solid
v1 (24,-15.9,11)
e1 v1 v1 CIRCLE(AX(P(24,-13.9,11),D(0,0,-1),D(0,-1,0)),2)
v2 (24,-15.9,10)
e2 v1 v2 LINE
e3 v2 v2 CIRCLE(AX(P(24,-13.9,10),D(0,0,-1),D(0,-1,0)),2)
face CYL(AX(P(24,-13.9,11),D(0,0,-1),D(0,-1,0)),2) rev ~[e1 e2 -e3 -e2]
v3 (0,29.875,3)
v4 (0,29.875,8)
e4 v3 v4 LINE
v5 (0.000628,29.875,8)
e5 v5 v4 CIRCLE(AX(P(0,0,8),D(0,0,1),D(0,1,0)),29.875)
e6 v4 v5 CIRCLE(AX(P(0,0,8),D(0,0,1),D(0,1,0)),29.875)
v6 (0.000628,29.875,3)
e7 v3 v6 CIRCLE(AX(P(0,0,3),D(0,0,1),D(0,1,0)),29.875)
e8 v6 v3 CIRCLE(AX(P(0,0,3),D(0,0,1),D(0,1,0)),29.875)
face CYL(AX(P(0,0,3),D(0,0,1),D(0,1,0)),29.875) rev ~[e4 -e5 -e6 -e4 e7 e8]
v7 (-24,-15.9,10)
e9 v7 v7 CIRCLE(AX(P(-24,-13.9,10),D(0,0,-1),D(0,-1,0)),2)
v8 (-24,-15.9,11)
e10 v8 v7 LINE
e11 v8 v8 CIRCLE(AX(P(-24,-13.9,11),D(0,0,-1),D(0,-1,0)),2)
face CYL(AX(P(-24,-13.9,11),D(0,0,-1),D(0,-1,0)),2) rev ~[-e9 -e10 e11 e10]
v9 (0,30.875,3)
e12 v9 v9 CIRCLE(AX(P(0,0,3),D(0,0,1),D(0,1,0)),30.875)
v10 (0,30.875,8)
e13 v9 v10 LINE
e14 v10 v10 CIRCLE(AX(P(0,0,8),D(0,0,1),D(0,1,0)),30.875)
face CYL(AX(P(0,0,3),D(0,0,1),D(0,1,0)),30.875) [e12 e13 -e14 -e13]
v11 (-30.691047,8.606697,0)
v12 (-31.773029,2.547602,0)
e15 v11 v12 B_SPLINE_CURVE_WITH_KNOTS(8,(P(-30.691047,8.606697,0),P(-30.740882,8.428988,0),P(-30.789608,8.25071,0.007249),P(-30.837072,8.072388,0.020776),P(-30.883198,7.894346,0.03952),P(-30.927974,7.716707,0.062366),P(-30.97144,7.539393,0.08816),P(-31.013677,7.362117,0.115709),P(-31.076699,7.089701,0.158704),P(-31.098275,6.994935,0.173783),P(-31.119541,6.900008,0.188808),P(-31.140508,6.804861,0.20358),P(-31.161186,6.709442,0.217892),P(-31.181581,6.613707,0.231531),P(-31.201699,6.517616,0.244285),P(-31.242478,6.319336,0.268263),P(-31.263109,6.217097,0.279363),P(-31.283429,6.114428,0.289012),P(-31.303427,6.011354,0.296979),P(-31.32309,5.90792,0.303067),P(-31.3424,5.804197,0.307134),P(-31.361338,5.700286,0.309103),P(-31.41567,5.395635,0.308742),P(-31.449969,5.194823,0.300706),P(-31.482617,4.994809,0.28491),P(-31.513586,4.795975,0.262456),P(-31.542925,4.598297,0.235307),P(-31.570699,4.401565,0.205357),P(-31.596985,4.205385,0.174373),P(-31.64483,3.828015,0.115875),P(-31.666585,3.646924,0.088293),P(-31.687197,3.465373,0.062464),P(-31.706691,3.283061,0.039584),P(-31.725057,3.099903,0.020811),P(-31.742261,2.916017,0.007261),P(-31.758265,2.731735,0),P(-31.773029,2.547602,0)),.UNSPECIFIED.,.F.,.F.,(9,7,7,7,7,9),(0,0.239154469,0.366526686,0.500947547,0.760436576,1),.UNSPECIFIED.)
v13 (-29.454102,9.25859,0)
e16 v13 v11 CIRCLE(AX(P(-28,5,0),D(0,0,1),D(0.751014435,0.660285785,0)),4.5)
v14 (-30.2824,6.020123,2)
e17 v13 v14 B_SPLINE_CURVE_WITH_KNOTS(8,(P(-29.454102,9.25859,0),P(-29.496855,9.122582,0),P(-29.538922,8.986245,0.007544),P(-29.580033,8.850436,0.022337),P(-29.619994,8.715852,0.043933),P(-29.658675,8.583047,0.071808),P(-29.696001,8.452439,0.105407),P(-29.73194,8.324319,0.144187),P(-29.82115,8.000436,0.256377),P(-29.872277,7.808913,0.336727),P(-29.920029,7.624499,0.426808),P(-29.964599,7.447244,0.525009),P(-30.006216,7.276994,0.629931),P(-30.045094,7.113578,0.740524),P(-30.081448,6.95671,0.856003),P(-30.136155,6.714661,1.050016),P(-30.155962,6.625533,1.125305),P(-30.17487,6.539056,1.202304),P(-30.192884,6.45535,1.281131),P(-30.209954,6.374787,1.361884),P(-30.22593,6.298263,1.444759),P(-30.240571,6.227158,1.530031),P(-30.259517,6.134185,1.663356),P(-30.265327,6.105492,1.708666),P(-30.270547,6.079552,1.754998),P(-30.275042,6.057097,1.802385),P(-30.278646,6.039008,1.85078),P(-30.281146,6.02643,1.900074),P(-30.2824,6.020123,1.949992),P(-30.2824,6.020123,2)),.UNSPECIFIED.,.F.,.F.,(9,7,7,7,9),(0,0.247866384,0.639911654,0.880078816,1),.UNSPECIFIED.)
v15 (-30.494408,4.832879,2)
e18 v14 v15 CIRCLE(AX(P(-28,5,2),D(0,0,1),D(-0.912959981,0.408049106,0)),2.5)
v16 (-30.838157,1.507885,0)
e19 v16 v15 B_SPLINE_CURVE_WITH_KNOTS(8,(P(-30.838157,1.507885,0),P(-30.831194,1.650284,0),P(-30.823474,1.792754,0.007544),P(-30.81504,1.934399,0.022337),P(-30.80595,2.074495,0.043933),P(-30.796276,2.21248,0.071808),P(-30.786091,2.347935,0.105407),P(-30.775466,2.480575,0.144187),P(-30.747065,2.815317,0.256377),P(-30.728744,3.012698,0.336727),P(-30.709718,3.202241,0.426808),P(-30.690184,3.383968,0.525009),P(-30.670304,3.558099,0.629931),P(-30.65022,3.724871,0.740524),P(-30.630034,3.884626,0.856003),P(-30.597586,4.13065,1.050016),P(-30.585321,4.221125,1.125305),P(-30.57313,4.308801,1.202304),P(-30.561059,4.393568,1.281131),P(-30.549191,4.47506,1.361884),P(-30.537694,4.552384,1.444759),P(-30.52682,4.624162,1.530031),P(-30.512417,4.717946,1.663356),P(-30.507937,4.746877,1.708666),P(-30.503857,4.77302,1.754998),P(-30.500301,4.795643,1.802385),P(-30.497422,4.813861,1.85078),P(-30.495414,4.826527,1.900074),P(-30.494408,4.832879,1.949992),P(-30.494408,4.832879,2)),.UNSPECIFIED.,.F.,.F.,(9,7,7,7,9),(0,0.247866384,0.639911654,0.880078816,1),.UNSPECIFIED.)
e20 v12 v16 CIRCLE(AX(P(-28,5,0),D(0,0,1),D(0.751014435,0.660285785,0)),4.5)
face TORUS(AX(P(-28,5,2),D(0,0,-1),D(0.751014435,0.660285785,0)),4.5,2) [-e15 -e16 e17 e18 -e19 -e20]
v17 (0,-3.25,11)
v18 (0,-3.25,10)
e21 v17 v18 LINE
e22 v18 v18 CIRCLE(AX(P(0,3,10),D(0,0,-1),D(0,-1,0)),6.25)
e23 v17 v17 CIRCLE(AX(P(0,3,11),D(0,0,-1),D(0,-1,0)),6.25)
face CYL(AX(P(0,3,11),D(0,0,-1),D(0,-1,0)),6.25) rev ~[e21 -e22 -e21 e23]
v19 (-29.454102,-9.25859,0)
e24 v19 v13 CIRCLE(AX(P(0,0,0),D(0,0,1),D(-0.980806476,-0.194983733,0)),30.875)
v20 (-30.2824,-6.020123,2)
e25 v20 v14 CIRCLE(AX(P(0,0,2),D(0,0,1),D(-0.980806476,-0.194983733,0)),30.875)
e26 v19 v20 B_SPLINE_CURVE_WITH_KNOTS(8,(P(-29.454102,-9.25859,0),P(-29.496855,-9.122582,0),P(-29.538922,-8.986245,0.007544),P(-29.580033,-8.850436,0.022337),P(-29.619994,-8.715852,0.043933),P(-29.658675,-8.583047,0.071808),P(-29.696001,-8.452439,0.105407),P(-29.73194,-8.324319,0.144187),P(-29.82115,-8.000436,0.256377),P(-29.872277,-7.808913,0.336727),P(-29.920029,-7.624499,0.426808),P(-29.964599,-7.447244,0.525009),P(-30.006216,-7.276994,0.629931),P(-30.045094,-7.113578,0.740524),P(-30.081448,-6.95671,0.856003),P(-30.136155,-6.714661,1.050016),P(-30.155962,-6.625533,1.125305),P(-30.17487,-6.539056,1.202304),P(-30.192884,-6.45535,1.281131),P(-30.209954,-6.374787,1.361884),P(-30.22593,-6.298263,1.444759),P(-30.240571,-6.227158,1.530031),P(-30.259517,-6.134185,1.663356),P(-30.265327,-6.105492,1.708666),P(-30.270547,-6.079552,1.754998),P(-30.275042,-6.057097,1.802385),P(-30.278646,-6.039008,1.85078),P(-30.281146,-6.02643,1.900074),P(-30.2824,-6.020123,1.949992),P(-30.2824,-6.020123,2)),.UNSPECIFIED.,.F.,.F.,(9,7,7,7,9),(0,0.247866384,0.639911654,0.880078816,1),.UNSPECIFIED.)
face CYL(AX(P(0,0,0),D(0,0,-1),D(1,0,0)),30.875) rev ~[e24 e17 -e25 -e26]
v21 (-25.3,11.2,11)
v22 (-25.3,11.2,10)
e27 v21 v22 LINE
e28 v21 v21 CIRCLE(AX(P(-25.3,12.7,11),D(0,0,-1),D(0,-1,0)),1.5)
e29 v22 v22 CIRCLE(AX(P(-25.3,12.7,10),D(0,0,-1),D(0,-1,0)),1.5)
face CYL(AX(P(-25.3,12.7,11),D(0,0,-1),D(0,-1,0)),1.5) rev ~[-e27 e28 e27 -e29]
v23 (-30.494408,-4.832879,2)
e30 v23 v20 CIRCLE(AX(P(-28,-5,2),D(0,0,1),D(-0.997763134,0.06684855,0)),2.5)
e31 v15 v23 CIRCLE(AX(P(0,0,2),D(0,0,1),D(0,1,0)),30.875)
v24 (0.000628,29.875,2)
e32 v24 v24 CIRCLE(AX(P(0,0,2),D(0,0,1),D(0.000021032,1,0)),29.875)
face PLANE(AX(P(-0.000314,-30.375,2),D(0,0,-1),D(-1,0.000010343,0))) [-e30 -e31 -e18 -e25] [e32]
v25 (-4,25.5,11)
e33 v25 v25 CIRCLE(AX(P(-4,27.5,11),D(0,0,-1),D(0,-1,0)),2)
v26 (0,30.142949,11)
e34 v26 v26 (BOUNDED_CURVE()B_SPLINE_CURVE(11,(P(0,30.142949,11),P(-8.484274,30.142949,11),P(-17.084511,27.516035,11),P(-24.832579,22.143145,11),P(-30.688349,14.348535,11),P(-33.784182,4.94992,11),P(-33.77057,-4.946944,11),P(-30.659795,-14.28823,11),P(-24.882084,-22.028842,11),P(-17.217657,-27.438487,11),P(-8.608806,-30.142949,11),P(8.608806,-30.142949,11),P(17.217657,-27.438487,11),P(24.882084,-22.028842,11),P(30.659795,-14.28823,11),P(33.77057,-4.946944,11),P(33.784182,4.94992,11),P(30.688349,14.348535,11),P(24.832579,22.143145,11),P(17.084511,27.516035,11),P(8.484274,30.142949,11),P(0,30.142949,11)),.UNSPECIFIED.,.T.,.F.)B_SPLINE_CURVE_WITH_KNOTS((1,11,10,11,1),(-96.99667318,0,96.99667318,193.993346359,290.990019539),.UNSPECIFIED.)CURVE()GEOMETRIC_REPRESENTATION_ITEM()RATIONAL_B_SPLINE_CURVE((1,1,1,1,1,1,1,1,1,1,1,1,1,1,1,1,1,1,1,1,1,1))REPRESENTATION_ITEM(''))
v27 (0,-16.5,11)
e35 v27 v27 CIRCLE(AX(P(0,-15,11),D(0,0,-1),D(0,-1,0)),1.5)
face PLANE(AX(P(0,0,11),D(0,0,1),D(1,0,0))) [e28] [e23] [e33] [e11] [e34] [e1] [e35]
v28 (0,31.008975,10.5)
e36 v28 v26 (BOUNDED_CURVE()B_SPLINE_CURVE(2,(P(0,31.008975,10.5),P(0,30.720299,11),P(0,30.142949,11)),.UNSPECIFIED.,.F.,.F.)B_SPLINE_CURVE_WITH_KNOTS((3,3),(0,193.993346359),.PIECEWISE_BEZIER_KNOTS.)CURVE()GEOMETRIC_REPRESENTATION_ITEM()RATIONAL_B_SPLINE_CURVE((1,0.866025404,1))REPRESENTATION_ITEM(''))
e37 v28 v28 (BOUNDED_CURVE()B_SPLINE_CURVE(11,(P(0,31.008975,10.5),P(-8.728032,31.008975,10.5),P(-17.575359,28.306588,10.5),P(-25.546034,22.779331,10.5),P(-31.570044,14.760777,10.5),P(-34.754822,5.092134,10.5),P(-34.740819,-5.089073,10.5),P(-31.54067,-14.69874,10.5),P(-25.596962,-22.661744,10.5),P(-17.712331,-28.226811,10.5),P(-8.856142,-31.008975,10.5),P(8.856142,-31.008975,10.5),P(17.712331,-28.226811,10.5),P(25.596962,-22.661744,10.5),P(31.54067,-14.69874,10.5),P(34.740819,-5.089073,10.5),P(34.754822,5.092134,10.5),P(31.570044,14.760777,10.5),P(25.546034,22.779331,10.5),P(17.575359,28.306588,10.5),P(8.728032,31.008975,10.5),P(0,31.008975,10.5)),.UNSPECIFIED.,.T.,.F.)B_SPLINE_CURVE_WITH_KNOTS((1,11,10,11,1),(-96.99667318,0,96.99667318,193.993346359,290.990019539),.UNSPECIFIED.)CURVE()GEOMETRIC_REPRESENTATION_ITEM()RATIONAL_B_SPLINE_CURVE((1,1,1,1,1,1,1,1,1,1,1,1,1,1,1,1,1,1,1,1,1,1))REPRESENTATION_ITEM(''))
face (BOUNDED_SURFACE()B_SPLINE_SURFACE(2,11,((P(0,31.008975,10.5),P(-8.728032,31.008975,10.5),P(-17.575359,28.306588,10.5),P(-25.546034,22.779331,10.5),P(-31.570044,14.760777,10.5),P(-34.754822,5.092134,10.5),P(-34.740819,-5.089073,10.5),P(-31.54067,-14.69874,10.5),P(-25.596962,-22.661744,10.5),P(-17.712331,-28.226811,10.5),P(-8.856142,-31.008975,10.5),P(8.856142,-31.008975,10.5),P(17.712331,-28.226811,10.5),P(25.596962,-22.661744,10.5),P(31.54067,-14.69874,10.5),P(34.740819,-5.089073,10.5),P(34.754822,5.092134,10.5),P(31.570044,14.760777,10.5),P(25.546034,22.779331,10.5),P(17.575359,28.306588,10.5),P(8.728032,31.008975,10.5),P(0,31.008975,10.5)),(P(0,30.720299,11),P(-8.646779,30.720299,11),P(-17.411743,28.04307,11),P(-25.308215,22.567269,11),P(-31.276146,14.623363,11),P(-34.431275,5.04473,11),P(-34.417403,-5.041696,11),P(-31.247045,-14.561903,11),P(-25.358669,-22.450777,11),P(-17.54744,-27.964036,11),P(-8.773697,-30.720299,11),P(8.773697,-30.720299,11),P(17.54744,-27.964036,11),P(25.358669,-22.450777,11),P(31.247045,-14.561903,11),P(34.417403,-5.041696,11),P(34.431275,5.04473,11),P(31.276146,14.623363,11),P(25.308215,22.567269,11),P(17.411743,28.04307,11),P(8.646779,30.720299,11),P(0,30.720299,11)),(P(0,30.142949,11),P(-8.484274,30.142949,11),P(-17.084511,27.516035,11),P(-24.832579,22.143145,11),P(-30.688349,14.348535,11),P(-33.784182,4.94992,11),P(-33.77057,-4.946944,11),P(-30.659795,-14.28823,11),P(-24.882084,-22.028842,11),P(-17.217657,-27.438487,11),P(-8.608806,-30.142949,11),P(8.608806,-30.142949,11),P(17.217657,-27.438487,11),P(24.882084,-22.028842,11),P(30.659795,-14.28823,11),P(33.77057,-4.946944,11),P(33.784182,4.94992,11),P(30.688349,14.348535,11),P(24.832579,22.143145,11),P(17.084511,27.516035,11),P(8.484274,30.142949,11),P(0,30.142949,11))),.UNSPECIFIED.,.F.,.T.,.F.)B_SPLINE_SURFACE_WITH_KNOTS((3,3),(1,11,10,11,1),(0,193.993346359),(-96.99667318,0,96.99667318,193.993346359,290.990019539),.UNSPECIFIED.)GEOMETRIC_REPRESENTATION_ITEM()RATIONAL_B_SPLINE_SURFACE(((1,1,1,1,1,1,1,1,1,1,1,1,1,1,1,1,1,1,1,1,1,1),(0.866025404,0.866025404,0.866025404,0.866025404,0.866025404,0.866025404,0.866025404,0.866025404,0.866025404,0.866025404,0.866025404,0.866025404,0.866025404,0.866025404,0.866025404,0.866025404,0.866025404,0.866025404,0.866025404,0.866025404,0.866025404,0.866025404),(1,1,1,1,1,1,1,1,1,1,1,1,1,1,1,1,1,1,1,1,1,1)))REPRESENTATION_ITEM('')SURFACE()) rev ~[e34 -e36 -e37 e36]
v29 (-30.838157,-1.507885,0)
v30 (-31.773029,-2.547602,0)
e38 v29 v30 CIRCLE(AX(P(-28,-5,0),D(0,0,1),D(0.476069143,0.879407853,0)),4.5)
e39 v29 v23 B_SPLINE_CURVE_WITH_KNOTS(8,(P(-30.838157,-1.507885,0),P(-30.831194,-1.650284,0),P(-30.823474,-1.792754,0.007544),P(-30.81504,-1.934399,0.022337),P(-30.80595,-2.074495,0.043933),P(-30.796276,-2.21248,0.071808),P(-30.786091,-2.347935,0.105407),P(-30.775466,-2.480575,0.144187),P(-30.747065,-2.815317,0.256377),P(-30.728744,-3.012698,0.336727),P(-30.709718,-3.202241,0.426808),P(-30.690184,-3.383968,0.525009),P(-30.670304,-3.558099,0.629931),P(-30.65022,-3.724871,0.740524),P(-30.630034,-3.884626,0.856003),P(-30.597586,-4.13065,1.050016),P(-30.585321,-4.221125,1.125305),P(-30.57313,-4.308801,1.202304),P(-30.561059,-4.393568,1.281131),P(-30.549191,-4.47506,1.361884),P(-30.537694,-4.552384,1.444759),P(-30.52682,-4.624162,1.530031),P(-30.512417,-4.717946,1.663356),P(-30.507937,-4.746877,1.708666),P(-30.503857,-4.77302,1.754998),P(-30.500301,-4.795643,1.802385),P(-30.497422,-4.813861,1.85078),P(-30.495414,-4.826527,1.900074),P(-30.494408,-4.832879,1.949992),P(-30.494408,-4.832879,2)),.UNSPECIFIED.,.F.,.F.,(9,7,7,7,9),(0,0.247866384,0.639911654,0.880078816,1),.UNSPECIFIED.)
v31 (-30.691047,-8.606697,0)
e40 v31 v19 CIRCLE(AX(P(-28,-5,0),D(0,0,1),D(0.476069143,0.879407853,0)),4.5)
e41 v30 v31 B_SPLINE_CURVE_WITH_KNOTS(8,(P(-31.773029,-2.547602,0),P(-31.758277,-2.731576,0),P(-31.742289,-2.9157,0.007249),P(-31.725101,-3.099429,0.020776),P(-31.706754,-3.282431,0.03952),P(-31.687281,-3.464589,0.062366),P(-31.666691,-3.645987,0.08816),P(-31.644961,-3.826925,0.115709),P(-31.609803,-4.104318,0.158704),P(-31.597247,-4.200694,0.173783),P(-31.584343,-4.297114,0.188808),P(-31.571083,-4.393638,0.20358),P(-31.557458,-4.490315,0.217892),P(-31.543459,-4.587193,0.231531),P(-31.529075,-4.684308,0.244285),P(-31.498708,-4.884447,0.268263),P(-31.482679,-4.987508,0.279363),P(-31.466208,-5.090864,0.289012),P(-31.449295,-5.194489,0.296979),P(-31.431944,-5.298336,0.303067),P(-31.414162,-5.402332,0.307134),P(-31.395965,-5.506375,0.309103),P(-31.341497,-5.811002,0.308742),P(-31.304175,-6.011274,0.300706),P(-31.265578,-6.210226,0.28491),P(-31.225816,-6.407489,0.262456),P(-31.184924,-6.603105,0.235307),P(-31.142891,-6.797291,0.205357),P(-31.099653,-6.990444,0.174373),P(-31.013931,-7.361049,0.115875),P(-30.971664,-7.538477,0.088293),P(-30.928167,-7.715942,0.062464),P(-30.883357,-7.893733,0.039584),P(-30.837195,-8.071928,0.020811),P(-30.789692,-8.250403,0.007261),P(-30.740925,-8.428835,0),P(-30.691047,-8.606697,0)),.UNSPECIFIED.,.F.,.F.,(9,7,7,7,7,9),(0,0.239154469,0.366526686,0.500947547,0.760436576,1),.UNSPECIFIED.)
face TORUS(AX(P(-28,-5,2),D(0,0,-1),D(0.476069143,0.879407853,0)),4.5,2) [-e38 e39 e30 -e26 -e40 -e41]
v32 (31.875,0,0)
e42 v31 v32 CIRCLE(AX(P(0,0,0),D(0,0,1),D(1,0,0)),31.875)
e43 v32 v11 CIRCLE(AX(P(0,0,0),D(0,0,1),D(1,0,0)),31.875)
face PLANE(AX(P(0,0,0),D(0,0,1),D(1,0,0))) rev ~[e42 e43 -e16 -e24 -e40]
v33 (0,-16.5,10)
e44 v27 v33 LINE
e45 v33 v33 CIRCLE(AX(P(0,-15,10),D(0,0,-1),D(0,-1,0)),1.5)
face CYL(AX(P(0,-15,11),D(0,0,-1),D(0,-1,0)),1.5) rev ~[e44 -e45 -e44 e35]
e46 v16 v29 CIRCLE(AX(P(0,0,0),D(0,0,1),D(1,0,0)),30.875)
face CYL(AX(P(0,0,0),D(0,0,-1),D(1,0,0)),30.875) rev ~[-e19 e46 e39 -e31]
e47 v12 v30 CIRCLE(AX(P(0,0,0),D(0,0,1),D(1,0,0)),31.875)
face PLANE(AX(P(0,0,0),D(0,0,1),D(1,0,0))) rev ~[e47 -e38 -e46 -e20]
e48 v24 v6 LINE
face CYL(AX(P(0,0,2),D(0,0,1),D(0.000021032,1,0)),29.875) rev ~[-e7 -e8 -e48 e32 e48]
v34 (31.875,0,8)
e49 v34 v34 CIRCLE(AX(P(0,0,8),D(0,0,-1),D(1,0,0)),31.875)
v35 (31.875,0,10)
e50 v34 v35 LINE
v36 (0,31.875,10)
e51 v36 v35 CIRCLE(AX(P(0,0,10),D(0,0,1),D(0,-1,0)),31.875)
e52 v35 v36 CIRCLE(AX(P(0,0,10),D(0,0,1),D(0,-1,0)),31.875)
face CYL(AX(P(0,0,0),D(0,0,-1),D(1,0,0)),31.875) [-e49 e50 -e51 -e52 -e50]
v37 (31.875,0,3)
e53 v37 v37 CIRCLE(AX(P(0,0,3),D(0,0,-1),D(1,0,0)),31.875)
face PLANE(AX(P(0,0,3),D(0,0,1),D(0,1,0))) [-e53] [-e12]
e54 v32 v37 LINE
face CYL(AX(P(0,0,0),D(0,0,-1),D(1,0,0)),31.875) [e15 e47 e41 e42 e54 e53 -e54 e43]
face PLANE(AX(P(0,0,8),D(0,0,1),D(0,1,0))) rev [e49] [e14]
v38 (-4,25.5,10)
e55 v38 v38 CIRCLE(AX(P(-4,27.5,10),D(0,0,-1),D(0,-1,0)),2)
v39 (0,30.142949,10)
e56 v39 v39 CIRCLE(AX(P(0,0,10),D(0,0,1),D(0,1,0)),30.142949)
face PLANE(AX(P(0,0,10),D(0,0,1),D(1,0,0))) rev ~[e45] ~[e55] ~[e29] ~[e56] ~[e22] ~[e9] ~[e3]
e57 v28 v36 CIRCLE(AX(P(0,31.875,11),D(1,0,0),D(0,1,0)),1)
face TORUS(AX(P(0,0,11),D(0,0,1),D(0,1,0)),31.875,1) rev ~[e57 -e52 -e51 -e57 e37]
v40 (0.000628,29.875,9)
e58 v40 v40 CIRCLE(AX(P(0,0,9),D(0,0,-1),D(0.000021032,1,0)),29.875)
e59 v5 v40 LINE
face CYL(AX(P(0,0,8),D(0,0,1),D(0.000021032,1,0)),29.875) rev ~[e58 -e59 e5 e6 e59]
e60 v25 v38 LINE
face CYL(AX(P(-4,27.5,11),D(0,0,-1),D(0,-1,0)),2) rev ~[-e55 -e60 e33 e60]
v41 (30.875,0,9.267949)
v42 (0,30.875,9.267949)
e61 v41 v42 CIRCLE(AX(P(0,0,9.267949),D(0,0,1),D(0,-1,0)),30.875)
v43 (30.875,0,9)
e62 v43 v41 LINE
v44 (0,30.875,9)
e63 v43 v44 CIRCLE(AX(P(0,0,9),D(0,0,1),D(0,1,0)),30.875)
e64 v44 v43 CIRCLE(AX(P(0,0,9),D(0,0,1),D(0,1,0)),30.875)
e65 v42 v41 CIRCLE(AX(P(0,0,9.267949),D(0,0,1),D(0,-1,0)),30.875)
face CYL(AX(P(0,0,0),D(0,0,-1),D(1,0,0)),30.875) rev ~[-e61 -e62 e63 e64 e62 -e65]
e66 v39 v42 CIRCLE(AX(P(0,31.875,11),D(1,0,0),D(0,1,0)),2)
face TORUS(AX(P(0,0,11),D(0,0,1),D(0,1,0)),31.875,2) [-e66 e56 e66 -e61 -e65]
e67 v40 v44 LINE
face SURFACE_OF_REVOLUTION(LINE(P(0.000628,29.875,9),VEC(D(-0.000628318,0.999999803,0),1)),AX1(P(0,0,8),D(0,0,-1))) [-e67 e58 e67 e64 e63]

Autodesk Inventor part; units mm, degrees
ref_plane "YZ Plane" through (0, 0, 0) normal (1, 0, 0) x (0, 1, 0)
ref_plane "XZ Plane" through (0, 0, 0) normal (0, 1, 0) x (-1, 0, 0)
ref_plane "XY Plane" through (0, 0, 0) normal (0, 0, 1) x (1, 0, 0)
sketch "Sketch1" plane through (0, 0, 0) normal (0, 0, 1) x (1, 0, 0)
  circle A0 centre (0, 0) radius 31.875
  dimension "d0" = 63.75
extrude "Extrusion1" add sketch "Sketch1" along normal blind 11
sketch "Sketch6" plane through (0, 0, 0) normal (1, 0, 0) x (0, 1, 0)
  line L0 (30.875, 8) -> (31.875, 8)
  line L1 (31.875, 8) -> (31.875, 3)
  line L2 (31.875, 3) -> (30.875, 3)
  line L3 (30.875, 3) -> (30.875, 8)
  line L4 (0, 0) -> (0, 11) construction
  line L5 (31.875, 11) -> (-31.875, 11) projected
  line L6 (-31.875, 0) -> (31.875, 0) projected
  circle A0 centre (31.875, 11) radius 1
  dimension "d62" = 1
  dimension "d63" = 5
  dimension "d65" = 31.875
  dimension "d66" = 63.75
  dimension "d67" = 3
  dimension "d81" = 2
revolve "Revolution1" cut sketch "Sketch6" angle 360 about axis through (0, 0, 0) along (0, 0, 1)
shell "Shell1" thickness 1 removed faces 1 at (5.5896, -2.5427, 0)
sketch "Sketch2" plane through (0, 0, 11) normal (0, 0, 1) x (1, 0, 0)
  circle A0 centre (0, 0) radius 31.875 projected
  point P0 (-4, 27.5)
  point P1 (-24, -13.9)
  point P2 (24, -13.9)
  dimension "d73" = 4
  dimension "d74" = 27.5
  dimension "d77" = 13.9
  dimension "d78" = 24
  dimension "d79" = 13.9
  dimension "d80" = 24
hole "Hole1" at (-4, 27.5, 11) at (24, -13.9, 11) at (-24, -13.9, 11) direction (0, 0, -1) diameter 4 end through all
sketch "Sketch3" plane through (0, 0, 11) normal (0, 0, 1) x (1, 0, 0)
  circle A0 centre (0, 0) radius 31.875 projected
  point P0 (-25.3, 12.7)
  dimension "d31" = 25.3
  dimension "d32" = 12.7
hole "Hole2" at (-25.3, 12.7, 11) direction (0, 0, -1) diameter 3 end through all
sketch "Sketch4" plane through (0, 0, 11) normal (0, 0, 1) x (1, 0, 0)
  point P0 (0, 0)
  point P1 (0, 3)
  dimension "d40" = 3
hole "Hole3" at (0, 3, 11) direction (0, 0, -1) diameter 12.5 end through all
sketch "Sketch5" plane through (0, 0, 11) normal (0, 0, 1) x (1, 0, 0)
  point P0 (0, 0)
  point P1 (0, -15)
  dimension "d48" = 15
hole "Hole4" at (0, -15, 11) direction (0, 0, -1) diameter 3 end through all
fillet "Fillet1" radius 1 1 edges at (0, -30.875, 11)
sketch "Sketch7" plane through (0, 0, 0) normal (0, 0, -1) x (-1, 0, 0)
  line L0 (0, 0) -> (28, 0) construction
  line L1 (28, -5) -> (28, 5) construction
  circle A0 centre (28, -5) radius 2.5
  circle A1 centre (28, 5) radius 2.5
  circle A2 centre (0, 0) radius 31.009 projected
  dimension "d83" = 28
  dimension "d84" = 10
  dimension "d85" = 5
  dimension "d86" = 5
extrude "Extrusion2" cut sketch "Sketch7" against normal blind 2 contours A0 | A1
fillet "Fillet2" radius 2 2 edges at (-30.4611, -5.4395, 0) (-30.4611, 5.4395, 0)
equation "\"d65\" = 0.5 * d66"
equation "\"d77\" = d79"
equation "\"d78\" = d80"
properties part number "407-02" material "Stainless Steel"
